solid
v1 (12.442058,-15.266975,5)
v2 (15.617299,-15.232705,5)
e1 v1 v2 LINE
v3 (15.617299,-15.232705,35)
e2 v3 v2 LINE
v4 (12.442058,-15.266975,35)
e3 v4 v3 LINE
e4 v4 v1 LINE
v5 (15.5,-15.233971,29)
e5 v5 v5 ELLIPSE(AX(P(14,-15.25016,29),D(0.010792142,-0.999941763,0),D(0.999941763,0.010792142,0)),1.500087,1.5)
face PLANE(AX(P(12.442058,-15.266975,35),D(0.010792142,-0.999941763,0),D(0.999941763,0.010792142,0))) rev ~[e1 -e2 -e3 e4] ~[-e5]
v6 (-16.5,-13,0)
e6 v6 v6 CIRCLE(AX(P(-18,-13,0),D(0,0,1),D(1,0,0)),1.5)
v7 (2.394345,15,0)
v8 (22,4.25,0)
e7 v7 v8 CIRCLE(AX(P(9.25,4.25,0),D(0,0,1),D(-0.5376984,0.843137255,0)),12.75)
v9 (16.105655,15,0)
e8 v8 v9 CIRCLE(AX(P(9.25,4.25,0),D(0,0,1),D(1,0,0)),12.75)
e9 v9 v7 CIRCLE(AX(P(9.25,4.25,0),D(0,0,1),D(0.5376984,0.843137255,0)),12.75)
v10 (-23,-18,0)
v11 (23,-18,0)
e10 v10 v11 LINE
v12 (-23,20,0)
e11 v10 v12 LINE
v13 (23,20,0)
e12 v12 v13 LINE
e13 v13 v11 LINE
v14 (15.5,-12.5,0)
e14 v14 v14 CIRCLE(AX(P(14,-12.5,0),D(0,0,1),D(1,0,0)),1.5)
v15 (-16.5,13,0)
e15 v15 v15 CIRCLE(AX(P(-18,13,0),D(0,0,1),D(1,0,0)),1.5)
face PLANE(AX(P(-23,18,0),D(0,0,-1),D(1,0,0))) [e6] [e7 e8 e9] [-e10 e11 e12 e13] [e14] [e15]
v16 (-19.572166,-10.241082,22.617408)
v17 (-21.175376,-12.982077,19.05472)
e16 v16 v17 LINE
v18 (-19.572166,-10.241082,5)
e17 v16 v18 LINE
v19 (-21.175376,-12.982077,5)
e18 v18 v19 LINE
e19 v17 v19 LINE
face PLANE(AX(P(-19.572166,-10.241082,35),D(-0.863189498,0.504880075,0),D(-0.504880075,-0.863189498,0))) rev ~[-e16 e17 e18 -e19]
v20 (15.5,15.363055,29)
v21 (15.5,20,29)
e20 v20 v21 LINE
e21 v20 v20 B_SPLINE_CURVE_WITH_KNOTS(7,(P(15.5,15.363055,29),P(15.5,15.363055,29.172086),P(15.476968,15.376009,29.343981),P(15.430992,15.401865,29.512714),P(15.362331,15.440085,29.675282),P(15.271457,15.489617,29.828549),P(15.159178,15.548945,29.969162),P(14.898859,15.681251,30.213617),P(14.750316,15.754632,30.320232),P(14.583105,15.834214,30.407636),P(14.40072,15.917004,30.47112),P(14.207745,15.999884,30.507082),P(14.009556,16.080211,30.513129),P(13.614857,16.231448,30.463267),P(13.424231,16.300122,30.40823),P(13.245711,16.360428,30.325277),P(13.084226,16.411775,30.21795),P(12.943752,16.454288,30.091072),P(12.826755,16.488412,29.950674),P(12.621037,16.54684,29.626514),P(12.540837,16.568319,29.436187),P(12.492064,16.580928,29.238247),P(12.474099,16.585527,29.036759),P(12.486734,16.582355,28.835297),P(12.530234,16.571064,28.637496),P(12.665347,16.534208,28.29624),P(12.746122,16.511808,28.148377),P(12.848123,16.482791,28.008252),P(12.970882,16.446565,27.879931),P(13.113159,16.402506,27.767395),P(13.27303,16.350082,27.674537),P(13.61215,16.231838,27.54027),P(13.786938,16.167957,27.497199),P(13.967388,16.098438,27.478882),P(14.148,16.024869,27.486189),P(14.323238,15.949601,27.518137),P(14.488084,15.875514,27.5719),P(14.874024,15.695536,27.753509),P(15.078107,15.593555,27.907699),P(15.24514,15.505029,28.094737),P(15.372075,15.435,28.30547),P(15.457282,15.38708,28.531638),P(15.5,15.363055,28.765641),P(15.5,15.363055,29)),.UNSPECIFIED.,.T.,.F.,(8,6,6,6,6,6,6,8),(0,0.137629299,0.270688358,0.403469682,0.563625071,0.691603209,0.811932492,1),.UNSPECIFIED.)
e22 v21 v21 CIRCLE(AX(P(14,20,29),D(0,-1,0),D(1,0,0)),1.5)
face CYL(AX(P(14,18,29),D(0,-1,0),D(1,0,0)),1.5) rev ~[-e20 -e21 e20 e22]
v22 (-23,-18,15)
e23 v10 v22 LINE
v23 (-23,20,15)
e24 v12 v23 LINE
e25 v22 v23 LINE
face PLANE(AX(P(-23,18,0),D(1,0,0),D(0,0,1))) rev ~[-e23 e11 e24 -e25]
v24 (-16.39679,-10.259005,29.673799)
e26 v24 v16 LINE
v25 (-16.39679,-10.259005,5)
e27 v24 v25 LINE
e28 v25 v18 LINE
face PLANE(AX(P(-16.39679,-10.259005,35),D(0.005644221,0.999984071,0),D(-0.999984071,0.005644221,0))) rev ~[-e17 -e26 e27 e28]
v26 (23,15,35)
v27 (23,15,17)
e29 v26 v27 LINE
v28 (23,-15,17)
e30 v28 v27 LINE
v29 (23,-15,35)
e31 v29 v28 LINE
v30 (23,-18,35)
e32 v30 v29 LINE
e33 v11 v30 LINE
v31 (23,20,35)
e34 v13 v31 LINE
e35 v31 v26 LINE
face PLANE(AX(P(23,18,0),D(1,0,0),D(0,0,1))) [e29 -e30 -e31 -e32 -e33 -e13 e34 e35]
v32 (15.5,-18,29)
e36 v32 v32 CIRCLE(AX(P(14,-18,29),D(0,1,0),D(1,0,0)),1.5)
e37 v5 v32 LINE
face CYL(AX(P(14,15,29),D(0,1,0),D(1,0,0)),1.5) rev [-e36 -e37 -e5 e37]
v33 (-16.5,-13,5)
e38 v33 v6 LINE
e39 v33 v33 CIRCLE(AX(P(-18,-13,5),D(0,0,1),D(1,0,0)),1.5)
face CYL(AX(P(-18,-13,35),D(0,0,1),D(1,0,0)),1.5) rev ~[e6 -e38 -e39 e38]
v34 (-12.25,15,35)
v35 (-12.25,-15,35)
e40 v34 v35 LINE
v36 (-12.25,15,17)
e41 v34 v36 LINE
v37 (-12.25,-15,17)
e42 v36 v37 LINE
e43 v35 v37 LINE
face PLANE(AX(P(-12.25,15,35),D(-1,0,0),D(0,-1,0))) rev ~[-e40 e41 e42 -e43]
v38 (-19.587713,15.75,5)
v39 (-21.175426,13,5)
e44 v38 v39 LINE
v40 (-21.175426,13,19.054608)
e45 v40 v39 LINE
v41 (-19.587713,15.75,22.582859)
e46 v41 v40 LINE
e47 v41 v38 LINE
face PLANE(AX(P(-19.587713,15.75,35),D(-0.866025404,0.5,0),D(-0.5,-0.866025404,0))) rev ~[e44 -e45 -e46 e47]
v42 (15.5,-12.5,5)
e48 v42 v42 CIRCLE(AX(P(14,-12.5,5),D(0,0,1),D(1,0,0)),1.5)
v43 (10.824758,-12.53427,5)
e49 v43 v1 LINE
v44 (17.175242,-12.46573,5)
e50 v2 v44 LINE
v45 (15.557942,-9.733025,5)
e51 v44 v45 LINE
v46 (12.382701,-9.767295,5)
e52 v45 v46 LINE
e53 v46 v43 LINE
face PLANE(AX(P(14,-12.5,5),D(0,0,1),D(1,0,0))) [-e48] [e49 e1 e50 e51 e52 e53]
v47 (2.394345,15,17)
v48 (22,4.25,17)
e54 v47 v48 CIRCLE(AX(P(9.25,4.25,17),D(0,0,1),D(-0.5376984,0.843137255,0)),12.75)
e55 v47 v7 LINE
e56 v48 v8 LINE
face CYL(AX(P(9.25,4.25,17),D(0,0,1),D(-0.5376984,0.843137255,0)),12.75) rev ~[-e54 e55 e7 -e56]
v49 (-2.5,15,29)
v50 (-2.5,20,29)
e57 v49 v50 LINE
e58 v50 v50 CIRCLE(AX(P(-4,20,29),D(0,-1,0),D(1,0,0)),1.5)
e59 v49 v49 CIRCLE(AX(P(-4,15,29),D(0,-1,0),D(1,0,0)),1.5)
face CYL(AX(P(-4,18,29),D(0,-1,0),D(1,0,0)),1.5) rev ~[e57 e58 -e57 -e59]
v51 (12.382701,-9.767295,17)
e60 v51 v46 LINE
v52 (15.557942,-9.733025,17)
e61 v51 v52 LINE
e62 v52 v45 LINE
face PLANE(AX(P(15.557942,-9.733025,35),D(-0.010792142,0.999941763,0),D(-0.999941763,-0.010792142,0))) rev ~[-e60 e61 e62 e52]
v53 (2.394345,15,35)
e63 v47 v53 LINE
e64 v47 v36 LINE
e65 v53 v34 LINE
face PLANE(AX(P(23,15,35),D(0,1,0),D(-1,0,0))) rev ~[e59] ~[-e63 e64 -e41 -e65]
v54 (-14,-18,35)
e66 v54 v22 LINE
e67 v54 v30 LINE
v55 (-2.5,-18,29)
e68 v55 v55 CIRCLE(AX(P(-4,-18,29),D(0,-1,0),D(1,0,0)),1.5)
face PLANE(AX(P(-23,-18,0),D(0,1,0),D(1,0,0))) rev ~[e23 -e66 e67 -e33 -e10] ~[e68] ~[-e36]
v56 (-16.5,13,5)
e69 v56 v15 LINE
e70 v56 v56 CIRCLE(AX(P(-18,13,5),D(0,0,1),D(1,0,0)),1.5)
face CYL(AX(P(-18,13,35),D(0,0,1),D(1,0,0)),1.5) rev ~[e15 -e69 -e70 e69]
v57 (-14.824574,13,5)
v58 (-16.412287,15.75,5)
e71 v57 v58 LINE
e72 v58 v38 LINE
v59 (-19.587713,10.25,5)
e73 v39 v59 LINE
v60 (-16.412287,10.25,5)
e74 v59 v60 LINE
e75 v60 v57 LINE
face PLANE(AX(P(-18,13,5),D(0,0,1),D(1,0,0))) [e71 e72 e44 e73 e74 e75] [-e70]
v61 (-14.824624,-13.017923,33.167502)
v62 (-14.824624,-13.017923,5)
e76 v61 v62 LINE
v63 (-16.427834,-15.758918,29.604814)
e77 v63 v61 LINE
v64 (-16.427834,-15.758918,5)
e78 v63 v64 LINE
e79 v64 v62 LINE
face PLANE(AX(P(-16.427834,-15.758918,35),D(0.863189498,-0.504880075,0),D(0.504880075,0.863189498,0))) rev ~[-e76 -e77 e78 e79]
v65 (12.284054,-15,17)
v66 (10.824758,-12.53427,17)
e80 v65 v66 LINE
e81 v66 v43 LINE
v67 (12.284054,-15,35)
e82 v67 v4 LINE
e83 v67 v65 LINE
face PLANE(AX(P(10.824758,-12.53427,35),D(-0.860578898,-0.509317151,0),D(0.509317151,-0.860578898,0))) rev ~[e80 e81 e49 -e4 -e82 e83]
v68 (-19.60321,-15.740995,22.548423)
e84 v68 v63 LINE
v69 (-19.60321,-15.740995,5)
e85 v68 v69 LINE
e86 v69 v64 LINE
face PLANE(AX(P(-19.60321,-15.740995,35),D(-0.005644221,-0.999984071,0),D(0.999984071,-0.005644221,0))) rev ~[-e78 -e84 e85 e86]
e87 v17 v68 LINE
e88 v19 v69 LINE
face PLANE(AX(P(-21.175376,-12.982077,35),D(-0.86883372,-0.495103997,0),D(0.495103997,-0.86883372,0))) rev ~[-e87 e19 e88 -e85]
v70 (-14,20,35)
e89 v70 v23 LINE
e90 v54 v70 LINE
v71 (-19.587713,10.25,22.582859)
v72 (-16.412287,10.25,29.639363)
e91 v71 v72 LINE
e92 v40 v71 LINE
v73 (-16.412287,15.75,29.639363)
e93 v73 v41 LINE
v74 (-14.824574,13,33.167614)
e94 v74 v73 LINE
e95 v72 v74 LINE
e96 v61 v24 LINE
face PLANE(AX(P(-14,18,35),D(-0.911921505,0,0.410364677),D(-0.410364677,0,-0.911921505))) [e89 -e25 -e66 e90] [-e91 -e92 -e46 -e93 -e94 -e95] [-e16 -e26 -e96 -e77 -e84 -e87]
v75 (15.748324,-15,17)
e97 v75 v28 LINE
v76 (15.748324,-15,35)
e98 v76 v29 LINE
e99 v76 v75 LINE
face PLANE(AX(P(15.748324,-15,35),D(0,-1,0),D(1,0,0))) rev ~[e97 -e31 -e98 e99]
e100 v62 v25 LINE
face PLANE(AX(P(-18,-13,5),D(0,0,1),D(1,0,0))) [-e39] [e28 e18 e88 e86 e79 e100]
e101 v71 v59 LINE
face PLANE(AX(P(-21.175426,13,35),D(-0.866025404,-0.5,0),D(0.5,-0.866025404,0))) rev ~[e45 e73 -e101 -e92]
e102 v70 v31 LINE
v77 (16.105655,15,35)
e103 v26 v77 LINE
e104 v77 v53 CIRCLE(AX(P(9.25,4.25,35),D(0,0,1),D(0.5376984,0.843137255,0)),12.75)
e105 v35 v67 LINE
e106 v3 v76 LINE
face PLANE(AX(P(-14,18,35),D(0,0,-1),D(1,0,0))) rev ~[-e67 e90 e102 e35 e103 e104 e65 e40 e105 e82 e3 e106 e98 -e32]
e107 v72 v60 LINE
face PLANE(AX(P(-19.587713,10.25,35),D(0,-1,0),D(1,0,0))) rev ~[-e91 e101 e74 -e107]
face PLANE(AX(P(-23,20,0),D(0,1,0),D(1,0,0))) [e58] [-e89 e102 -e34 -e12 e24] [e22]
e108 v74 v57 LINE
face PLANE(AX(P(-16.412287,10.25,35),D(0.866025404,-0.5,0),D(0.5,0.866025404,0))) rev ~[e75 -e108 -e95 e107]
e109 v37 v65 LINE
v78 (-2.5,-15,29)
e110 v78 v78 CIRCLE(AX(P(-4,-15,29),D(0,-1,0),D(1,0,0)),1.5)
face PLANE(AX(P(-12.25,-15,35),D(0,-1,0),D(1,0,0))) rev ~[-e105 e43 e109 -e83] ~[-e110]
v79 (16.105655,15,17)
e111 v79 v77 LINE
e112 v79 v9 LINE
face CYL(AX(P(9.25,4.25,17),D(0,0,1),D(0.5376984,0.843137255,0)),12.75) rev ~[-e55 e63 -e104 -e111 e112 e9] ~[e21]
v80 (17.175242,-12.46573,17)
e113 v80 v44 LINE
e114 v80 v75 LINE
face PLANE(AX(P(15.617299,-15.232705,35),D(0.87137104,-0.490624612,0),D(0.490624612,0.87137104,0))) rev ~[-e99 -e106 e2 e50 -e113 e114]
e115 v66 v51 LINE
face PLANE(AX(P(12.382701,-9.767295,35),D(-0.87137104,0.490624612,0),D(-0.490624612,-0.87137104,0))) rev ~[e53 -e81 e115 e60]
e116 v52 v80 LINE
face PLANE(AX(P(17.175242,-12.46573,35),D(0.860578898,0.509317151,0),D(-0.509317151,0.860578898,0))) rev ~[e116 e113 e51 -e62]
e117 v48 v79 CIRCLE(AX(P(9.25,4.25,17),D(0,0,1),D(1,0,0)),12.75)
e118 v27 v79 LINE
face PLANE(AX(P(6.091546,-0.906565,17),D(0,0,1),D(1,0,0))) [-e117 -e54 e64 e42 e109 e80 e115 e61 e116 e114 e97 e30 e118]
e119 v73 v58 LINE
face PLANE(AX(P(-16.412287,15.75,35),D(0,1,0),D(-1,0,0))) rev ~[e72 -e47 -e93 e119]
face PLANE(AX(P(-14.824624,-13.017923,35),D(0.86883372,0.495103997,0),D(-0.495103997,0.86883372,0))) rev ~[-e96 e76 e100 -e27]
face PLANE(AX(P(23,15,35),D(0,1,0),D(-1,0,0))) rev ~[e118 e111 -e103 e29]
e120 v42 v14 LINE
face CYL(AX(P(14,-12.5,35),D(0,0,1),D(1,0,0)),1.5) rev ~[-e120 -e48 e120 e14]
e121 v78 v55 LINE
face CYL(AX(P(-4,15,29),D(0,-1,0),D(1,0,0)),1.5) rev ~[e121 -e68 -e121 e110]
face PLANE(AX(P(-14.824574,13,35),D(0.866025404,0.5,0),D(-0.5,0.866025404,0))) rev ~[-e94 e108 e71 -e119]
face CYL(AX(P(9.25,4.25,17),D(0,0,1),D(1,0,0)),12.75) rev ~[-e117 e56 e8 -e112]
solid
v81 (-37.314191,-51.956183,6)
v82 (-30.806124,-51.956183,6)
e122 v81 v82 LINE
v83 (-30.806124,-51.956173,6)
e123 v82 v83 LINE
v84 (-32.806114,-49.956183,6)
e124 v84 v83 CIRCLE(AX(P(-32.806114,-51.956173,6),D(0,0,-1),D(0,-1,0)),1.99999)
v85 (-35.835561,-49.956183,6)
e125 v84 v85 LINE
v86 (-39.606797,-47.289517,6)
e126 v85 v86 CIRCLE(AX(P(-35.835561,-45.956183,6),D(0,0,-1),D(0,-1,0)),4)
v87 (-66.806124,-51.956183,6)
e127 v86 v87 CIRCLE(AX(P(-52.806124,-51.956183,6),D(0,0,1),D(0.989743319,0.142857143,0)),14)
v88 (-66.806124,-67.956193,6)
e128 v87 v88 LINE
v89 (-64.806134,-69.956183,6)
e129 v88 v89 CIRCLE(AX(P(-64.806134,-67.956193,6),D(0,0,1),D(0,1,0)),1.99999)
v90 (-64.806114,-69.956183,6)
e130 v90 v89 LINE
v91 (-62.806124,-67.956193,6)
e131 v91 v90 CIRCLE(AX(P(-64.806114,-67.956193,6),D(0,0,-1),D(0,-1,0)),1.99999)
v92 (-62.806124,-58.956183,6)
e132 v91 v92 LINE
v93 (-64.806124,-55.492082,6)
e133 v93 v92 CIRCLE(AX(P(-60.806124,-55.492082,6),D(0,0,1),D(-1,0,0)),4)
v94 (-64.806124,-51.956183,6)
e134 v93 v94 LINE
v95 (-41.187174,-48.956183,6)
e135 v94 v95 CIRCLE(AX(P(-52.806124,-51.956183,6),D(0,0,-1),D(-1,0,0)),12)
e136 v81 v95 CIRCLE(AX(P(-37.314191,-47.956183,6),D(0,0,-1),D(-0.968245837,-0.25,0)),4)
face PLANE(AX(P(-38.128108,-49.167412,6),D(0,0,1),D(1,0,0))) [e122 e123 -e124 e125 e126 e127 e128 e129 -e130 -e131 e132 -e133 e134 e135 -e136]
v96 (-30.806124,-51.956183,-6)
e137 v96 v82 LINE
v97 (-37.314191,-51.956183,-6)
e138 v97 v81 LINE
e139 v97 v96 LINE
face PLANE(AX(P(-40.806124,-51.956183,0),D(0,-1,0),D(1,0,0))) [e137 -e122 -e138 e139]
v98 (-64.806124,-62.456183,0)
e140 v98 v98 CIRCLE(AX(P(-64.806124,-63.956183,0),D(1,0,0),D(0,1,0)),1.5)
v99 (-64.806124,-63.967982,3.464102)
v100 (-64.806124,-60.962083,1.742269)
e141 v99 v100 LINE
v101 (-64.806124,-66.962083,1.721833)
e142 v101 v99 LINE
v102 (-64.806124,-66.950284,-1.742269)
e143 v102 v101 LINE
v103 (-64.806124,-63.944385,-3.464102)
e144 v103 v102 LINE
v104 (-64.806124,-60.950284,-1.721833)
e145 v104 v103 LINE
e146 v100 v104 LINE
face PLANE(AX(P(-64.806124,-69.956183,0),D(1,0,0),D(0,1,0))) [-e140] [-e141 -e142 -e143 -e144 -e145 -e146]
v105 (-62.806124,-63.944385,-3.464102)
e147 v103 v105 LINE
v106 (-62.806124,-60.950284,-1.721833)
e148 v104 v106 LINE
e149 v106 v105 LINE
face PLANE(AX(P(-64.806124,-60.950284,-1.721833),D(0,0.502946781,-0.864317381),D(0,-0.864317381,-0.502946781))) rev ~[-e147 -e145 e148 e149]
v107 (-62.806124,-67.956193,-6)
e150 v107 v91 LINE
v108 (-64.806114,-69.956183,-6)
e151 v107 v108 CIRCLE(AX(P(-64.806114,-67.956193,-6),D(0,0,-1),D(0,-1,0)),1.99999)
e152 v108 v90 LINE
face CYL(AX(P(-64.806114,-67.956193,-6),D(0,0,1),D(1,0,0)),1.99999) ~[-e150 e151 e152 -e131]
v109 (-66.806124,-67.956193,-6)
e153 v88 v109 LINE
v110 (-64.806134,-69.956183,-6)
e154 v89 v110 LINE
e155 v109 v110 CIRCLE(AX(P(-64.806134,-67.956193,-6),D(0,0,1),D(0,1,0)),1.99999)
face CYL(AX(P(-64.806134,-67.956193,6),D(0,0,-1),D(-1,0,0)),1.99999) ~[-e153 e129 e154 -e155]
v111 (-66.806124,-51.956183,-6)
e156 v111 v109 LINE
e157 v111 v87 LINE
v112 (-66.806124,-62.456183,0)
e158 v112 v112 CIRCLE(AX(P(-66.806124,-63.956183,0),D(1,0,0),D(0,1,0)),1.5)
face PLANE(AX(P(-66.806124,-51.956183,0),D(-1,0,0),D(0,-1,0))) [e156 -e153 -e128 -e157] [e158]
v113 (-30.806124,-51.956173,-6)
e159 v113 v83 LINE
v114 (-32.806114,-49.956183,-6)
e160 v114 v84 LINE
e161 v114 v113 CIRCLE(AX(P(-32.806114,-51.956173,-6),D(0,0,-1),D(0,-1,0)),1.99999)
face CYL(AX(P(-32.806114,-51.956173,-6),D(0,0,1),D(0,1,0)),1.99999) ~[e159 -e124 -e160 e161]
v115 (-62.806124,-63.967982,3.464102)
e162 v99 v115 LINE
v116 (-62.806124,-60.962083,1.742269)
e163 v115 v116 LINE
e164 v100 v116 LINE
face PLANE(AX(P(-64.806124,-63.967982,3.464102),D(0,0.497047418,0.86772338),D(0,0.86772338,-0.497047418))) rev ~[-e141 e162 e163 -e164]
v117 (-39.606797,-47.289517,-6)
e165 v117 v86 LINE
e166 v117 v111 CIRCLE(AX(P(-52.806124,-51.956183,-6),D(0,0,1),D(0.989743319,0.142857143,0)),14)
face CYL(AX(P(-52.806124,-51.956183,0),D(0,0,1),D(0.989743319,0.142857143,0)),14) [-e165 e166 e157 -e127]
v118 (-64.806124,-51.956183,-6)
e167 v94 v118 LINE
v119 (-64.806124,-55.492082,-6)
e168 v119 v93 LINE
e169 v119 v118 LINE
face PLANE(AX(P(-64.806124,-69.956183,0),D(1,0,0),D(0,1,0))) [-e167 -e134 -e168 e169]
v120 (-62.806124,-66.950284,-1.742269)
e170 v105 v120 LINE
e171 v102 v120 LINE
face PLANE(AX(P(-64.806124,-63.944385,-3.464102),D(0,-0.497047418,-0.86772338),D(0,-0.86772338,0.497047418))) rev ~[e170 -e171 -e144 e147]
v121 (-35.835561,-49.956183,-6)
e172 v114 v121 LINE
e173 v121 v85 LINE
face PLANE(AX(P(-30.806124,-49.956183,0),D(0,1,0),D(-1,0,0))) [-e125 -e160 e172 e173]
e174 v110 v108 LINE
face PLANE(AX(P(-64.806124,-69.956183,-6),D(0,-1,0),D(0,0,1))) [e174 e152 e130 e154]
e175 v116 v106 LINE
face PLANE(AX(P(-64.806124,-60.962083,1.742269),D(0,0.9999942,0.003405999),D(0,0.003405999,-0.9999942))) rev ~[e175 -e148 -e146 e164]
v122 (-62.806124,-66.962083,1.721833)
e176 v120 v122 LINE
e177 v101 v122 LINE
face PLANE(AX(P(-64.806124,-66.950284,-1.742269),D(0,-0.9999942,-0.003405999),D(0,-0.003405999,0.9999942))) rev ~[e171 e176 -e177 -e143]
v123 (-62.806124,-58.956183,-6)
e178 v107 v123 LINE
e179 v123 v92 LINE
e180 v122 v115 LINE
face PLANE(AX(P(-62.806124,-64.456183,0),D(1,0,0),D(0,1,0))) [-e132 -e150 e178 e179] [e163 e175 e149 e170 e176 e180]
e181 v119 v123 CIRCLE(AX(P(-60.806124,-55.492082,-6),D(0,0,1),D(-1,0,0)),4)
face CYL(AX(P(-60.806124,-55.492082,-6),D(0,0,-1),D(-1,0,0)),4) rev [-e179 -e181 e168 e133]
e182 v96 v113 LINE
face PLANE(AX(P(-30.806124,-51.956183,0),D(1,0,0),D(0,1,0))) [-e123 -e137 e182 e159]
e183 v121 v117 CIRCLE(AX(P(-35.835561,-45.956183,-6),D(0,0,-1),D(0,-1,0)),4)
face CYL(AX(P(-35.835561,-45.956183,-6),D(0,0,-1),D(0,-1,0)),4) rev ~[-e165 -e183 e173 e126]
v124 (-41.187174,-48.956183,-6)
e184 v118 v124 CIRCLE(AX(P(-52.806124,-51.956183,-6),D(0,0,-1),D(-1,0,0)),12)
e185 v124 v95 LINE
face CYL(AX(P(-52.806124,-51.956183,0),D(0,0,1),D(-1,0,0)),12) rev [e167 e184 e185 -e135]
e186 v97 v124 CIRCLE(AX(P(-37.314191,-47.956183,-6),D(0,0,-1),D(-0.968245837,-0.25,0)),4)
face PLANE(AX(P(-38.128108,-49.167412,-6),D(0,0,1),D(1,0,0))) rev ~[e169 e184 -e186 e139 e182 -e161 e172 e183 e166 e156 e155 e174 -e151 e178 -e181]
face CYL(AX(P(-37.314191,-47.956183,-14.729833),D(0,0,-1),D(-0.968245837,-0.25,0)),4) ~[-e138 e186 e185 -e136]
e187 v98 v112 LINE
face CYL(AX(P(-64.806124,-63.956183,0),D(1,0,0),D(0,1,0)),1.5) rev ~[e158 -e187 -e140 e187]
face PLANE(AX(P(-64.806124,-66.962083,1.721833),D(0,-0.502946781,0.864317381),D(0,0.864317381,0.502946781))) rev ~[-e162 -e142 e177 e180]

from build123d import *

# Parameters (mm, degrees)
F0_W         = 46
F0_H         = 36
F1_DEPTH     = 35
F2_R         = 1.5
F3_DEPTH     = 50
F4_DEPTH     = 30
F6_DEPTH     = 18
F8_DEPTH     = 25
F9_R         = 1.5
F10_DEPTH    = 50
F11_T1_DEPTH = 139.6606830198
F13_DEPTH    = 6
F14_W        = 11
F14_H        = 12
F15_DEPTH    = 2
F14_R        = 1.5
F16_DEPTH    = 25
F17_T1_DEPTH = 12
F17_T3_DEPTH = 12
F17_T5_DEPTH = 29.4596669241
F18_R        = 1.99999
F19_DEPTH    = 2


# Not quite as in the source:
# - a fillet or chamfer that OpenCascade refuses, or shapes differently, is made with other operations: its cross-section is extruded or revolved along the edge and cut away or added
# - a fillet or chamfer is up to 0.001 mm smaller than in the source, because OpenCascade refuses the exact size
# - a feature names something its author has since deleted; it is built from what else it names


with BuildPart() as f1:
    # F0 (on Top) → F1 (new body)
    with BuildSketch(Plane.XY):
        Rectangle(F0_W, F0_H)
    extrude(amount=F1_DEPTH)

    # F2 (on face) → F3 (cut)
    with BuildSketch(Plane.XY.offset(35)):
        with Locations((-18, 13)):
            Circle(F2_R)
        with Locations((-18, -13)):
            Circle(F2_R)
        with Locations((14, -12.5)):
            Circle(F2_R)
    extrude(amount=-F3_DEPTH, mode=Mode.SUBTRACT)

    # F2 (on face) → F4 (cut)
    with BuildSketch(Plane.XY.offset(35)):
        Polygon((10.8247584463, -12.5342696548), (12.4420576148, -15.266974676), (15.6172991685, -15.2327050212), (17.1752415537, -12.4657303452), (15.5579423852, -9.733025324), (12.3827008315, -9.7672949788), align=None)
        with Locations((14, -12.5)):
            Circle(F2_R, mode=Mode.SUBTRACT)
        Polygon((-14.8246241, -13.01792281), (-16.3967904413, -10.259005209), (-19.5721663413, -10.2410823991), (-21.1753759, -12.98207719), (-19.6032095587, -15.740994791), (-16.4278336587, -15.7589176009), align=None)
        with Locations((-18, -13)):
            Circle(F2_R, mode=Mode.SUBTRACT)
        Polygon((-19.5877132403, 15.75), (-21.1754264805, 13), (-19.5877132403, 10.25), (-16.4122867597, 10.25), (-14.8245735195, 13), (-16.4122867597, 15.75), align=None)
        with Locations((-18, 13)):
            Circle(F2_R, mode=Mode.SUBTRACT)
    extrude(amount=-F4_DEPTH, mode=Mode.SUBTRACT)

    # F5 (on face) → F6 (cut)
    with BuildSketch(Plane.XY.offset(35)):
        Polygon((15.7483235031, -15), (23, -15), (23, 15), (-12.25, 15), (-12.25, -15), (12.2840537621, -15), (10.8247584463, -12.5342696548), (12.3827008315, -9.7672949788), (15.5579423852, -9.733025324), (17.1752415537, -12.4657303452), align=None)
    extrude(amount=-F6_DEPTH, mode=Mode.SUBTRACT)

    # F7 (on face) → F8 (cut, symmetric)
    with BuildSketch(Plane.XY.offset(17)):
        with BuildLine():
            Line((2.3943453996, 15), (16.1056546004, 15))
            ThreePointArc((16.1056546004, 15), (9.25, 17), (2.3943453996, 15))
        make_face()
        with BuildLine():
            ThreePointArc((2.3943453996, 15), (3.120036548, -6.9297159211), (22, 4.25))
            ThreePointArc((22, 4.25), (20.4297159211, 10.379963452), (16.1056546004, 15))
            Line((16.1056546004, 15), (2.3943453996, 15))
        make_face()
    extrude(amount=F8_DEPTH, both=True, mode=Mode.SUBTRACT)

    # F9 (on face) → F10 (cut, symmetric)
    with BuildSketch(Plane.XZ.offset(-15)):
        with Locations((14, 29)):
            Circle(F9_R)
        with Locations((-4, 29)):
            Circle(F9_R)
    extrude(amount=F10_DEPTH, both=True, mode=Mode.SUBTRACT)

    # F11: chamfer of 9 x 20 on 1 edges, made by hand

    # F11_s2 → F11_t1 (cut)
    with BuildSketch(Plane.XZ.offset(-69.8303415099)):
        Polygon((-14, 35), (-23, 15), (-23, 35), align=None)
    extrude(amount=F11_T1_DEPTH, mode=Mode.SUBTRACT)

    # F19 (add): a face of the model
    f19_faces = [f1.faces().sort_by_distance(p)[0] for p in [
        (1.1483875738, 18, 16.7445677024),
    ]]
    extrude(f19_faces, amount=F19_DEPTH)


with BuildPart() as f13:
    # F12 (on Top) → F13 (new body, symmetric)
    with BuildSketch(Plane.XY):
        with BuildLine():
            ThreePointArc((-64.8061240633, -51.9561834335), (-52.8061240633, -39.9561834335), (-40.8061240633, -51.9561834335))
            Line((-40.8061240633, -51.9561834335), (-40.8061240633, -49.9561834335))
            Line((-40.8061240633, -49.9561834335), (-38.9497176027, -49.9561834335))
            ThreePointArc((-38.9497176027, -49.9561834335), (-53.8086981384, -37.9921279616), (-66.8061240633, -51.9561834335))
            Line((-66.8061240633, -51.9561834335), (-64.8061240633, -51.9561834335))
        make_face()
        with BuildLine():
            ThreePointArc((-38.9497176027, -49.9561834335), (-38.8420685913, -50.9536093584), (-38.8061240633, -51.9561834335))
            Line((-38.8061240633, -51.9561834335), (-30.8061240633, -51.9561834335))
            Line((-30.8061240633, -51.9561834335), (-30.8061240633, -49.9561834335))
            Line((-30.8061240633, -49.9561834335), (-38.9497176027, -49.9561834335))
        make_face()
        with BuildLine():
            Line((-40.8061240633, -49.9561834335), (-40.8061240633, -51.9561834335))
            Line((-40.8061240633, -51.9561834335), (-38.8061240633, -51.9561834335))
            ThreePointArc((-38.8061240633, -51.9561834335), (-38.8420685913, -50.9536093584), (-38.9497176027, -49.9561834335))
            Line((-38.9497176027, -49.9561834335), (-40.8061240633, -49.9561834335))
        make_face()
        with BuildLine():
            Line((-64.8061240633, -59.1672859845), (-64.8061240633, -51.9561834335))
            Line((-64.8061240633, -51.9561834335), (-66.8061240633, -51.9561834335))
            ThreePointArc((-66.8061240633, -51.9561834335), (-66.2968616265, -55.6978408203), (-64.8061240633, -59.1672859845))
        make_face()
        with BuildLine():
            ThreePointArc((-64.8061240633, -59.1672859845), (-66.2968616265, -55.6978408203), (-66.8061240633, -51.9561834335))
            Line((-66.8061240633, -51.9561834335), (-66.8061240633, -69.9561834335))
            Line((-66.8061240633, -69.9561834335), (-64.8061240633, -69.9561834335))
            Line((-64.8061240633, -69.9561834335), (-64.8061240633, -59.1672859845))
        make_face()
    extrude(amount=F13_DEPTH, both=True)

    # F14 (on face) → F15 (join)
    with BuildSketch(Plane.YZ.offset(-64.8061240633)):
        with Locations((-64.4561834335, 0)):
            Rectangle(F14_W, F14_H)
        Polygon((-60.9620828312, 1.742268864), (-60.9502840359, -1.7218327511), (-63.9443846382, -3.4641016151), (-66.9502840359, -1.742268864), (-66.9620828312, 1.7218327511), (-63.9679822288, 3.4641016151), align=None, mode=Mode.SUBTRACT)
    extrude(amount=F15_DEPTH)

    # F14 (on face) → F16 (cut)
    with BuildSketch(Plane.YZ.offset(-64.8061240633)):
        with Locations((-63.9561834335, 0)):
            Circle(F14_R)
    extrude(amount=-F16_DEPTH, mode=Mode.SUBTRACT)

    # F17: fillet of radius 4 on 3 edges, made by hand

    # F17_s2 → F17_t1 (join)
    with BuildSketch(Plane.XY.offset(-6)):
        with BuildLine():
            ThreePointArc((-64.8061240633, -55.4920818184), (-64.2702256784, -57.4920818184), (-62.8061240633, -58.9561834335))
            Line((-62.8061240633, -58.9561834335), (-64.8061240633, -58.9561834335))
            Line((-64.8061240633, -58.9561834335), (-64.8061240633, -55.4920818184))
        make_face()
    extrude(amount=F17_T1_DEPTH)

    # F17_s4 → F17_t3 (join)
    with BuildSketch(Plane.XY.offset(-6)):
        with BuildLine():
            ThreePointArc((-35.8355613148, -49.9561834335), (-38.1449623915, -49.2221697572), (-39.6067974811, -47.2895167669))
            ThreePointArc((-39.6067974811, -47.2895167669), (-39.2127083631, -48.6066984578), (-38.9497176027, -49.9561834335))
            Line((-38.9497176027, -49.9561834335), (-35.8355613148, -49.9561834335))
        make_face()
    extrude(amount=F17_T3_DEPTH)

    # F17_s6 → F17_t5 (cut)
    with BuildSketch(Plane.XY.offset(-14.7298334621)):
        with BuildLine():
            ThreePointArc((-41.1871740246, -48.9561834335), (-39.7636804212, -51.1184610937), (-37.3141906784, -51.9561834335))
            Line((-37.3141906784, -51.9561834335), (-40.8061240633, -51.9561834335))
            ThreePointArc((-40.8061240633, -51.9561834335), (-40.9017677081, -50.4441319237), (-41.1871740246, -48.9561834335))
        make_face()
    extrude(amount=F17_T5_DEPTH, mode=Mode.SUBTRACT)

    # F18 (radius 2 in the source; OpenCascade refuses exactly that, so slightly less here)
    f18_edges = [f13.edges().sort_by_distance(p)[0] for p in [
        (-66.806124, -69.956183, 0),
        (-62.806124, -69.956183, 0),
        (-30.806124, -49.956183, 0),
    ]]
    fillet(f18_edges, radius=F18_R)


solid = Compound([f1.part, f13.part])
